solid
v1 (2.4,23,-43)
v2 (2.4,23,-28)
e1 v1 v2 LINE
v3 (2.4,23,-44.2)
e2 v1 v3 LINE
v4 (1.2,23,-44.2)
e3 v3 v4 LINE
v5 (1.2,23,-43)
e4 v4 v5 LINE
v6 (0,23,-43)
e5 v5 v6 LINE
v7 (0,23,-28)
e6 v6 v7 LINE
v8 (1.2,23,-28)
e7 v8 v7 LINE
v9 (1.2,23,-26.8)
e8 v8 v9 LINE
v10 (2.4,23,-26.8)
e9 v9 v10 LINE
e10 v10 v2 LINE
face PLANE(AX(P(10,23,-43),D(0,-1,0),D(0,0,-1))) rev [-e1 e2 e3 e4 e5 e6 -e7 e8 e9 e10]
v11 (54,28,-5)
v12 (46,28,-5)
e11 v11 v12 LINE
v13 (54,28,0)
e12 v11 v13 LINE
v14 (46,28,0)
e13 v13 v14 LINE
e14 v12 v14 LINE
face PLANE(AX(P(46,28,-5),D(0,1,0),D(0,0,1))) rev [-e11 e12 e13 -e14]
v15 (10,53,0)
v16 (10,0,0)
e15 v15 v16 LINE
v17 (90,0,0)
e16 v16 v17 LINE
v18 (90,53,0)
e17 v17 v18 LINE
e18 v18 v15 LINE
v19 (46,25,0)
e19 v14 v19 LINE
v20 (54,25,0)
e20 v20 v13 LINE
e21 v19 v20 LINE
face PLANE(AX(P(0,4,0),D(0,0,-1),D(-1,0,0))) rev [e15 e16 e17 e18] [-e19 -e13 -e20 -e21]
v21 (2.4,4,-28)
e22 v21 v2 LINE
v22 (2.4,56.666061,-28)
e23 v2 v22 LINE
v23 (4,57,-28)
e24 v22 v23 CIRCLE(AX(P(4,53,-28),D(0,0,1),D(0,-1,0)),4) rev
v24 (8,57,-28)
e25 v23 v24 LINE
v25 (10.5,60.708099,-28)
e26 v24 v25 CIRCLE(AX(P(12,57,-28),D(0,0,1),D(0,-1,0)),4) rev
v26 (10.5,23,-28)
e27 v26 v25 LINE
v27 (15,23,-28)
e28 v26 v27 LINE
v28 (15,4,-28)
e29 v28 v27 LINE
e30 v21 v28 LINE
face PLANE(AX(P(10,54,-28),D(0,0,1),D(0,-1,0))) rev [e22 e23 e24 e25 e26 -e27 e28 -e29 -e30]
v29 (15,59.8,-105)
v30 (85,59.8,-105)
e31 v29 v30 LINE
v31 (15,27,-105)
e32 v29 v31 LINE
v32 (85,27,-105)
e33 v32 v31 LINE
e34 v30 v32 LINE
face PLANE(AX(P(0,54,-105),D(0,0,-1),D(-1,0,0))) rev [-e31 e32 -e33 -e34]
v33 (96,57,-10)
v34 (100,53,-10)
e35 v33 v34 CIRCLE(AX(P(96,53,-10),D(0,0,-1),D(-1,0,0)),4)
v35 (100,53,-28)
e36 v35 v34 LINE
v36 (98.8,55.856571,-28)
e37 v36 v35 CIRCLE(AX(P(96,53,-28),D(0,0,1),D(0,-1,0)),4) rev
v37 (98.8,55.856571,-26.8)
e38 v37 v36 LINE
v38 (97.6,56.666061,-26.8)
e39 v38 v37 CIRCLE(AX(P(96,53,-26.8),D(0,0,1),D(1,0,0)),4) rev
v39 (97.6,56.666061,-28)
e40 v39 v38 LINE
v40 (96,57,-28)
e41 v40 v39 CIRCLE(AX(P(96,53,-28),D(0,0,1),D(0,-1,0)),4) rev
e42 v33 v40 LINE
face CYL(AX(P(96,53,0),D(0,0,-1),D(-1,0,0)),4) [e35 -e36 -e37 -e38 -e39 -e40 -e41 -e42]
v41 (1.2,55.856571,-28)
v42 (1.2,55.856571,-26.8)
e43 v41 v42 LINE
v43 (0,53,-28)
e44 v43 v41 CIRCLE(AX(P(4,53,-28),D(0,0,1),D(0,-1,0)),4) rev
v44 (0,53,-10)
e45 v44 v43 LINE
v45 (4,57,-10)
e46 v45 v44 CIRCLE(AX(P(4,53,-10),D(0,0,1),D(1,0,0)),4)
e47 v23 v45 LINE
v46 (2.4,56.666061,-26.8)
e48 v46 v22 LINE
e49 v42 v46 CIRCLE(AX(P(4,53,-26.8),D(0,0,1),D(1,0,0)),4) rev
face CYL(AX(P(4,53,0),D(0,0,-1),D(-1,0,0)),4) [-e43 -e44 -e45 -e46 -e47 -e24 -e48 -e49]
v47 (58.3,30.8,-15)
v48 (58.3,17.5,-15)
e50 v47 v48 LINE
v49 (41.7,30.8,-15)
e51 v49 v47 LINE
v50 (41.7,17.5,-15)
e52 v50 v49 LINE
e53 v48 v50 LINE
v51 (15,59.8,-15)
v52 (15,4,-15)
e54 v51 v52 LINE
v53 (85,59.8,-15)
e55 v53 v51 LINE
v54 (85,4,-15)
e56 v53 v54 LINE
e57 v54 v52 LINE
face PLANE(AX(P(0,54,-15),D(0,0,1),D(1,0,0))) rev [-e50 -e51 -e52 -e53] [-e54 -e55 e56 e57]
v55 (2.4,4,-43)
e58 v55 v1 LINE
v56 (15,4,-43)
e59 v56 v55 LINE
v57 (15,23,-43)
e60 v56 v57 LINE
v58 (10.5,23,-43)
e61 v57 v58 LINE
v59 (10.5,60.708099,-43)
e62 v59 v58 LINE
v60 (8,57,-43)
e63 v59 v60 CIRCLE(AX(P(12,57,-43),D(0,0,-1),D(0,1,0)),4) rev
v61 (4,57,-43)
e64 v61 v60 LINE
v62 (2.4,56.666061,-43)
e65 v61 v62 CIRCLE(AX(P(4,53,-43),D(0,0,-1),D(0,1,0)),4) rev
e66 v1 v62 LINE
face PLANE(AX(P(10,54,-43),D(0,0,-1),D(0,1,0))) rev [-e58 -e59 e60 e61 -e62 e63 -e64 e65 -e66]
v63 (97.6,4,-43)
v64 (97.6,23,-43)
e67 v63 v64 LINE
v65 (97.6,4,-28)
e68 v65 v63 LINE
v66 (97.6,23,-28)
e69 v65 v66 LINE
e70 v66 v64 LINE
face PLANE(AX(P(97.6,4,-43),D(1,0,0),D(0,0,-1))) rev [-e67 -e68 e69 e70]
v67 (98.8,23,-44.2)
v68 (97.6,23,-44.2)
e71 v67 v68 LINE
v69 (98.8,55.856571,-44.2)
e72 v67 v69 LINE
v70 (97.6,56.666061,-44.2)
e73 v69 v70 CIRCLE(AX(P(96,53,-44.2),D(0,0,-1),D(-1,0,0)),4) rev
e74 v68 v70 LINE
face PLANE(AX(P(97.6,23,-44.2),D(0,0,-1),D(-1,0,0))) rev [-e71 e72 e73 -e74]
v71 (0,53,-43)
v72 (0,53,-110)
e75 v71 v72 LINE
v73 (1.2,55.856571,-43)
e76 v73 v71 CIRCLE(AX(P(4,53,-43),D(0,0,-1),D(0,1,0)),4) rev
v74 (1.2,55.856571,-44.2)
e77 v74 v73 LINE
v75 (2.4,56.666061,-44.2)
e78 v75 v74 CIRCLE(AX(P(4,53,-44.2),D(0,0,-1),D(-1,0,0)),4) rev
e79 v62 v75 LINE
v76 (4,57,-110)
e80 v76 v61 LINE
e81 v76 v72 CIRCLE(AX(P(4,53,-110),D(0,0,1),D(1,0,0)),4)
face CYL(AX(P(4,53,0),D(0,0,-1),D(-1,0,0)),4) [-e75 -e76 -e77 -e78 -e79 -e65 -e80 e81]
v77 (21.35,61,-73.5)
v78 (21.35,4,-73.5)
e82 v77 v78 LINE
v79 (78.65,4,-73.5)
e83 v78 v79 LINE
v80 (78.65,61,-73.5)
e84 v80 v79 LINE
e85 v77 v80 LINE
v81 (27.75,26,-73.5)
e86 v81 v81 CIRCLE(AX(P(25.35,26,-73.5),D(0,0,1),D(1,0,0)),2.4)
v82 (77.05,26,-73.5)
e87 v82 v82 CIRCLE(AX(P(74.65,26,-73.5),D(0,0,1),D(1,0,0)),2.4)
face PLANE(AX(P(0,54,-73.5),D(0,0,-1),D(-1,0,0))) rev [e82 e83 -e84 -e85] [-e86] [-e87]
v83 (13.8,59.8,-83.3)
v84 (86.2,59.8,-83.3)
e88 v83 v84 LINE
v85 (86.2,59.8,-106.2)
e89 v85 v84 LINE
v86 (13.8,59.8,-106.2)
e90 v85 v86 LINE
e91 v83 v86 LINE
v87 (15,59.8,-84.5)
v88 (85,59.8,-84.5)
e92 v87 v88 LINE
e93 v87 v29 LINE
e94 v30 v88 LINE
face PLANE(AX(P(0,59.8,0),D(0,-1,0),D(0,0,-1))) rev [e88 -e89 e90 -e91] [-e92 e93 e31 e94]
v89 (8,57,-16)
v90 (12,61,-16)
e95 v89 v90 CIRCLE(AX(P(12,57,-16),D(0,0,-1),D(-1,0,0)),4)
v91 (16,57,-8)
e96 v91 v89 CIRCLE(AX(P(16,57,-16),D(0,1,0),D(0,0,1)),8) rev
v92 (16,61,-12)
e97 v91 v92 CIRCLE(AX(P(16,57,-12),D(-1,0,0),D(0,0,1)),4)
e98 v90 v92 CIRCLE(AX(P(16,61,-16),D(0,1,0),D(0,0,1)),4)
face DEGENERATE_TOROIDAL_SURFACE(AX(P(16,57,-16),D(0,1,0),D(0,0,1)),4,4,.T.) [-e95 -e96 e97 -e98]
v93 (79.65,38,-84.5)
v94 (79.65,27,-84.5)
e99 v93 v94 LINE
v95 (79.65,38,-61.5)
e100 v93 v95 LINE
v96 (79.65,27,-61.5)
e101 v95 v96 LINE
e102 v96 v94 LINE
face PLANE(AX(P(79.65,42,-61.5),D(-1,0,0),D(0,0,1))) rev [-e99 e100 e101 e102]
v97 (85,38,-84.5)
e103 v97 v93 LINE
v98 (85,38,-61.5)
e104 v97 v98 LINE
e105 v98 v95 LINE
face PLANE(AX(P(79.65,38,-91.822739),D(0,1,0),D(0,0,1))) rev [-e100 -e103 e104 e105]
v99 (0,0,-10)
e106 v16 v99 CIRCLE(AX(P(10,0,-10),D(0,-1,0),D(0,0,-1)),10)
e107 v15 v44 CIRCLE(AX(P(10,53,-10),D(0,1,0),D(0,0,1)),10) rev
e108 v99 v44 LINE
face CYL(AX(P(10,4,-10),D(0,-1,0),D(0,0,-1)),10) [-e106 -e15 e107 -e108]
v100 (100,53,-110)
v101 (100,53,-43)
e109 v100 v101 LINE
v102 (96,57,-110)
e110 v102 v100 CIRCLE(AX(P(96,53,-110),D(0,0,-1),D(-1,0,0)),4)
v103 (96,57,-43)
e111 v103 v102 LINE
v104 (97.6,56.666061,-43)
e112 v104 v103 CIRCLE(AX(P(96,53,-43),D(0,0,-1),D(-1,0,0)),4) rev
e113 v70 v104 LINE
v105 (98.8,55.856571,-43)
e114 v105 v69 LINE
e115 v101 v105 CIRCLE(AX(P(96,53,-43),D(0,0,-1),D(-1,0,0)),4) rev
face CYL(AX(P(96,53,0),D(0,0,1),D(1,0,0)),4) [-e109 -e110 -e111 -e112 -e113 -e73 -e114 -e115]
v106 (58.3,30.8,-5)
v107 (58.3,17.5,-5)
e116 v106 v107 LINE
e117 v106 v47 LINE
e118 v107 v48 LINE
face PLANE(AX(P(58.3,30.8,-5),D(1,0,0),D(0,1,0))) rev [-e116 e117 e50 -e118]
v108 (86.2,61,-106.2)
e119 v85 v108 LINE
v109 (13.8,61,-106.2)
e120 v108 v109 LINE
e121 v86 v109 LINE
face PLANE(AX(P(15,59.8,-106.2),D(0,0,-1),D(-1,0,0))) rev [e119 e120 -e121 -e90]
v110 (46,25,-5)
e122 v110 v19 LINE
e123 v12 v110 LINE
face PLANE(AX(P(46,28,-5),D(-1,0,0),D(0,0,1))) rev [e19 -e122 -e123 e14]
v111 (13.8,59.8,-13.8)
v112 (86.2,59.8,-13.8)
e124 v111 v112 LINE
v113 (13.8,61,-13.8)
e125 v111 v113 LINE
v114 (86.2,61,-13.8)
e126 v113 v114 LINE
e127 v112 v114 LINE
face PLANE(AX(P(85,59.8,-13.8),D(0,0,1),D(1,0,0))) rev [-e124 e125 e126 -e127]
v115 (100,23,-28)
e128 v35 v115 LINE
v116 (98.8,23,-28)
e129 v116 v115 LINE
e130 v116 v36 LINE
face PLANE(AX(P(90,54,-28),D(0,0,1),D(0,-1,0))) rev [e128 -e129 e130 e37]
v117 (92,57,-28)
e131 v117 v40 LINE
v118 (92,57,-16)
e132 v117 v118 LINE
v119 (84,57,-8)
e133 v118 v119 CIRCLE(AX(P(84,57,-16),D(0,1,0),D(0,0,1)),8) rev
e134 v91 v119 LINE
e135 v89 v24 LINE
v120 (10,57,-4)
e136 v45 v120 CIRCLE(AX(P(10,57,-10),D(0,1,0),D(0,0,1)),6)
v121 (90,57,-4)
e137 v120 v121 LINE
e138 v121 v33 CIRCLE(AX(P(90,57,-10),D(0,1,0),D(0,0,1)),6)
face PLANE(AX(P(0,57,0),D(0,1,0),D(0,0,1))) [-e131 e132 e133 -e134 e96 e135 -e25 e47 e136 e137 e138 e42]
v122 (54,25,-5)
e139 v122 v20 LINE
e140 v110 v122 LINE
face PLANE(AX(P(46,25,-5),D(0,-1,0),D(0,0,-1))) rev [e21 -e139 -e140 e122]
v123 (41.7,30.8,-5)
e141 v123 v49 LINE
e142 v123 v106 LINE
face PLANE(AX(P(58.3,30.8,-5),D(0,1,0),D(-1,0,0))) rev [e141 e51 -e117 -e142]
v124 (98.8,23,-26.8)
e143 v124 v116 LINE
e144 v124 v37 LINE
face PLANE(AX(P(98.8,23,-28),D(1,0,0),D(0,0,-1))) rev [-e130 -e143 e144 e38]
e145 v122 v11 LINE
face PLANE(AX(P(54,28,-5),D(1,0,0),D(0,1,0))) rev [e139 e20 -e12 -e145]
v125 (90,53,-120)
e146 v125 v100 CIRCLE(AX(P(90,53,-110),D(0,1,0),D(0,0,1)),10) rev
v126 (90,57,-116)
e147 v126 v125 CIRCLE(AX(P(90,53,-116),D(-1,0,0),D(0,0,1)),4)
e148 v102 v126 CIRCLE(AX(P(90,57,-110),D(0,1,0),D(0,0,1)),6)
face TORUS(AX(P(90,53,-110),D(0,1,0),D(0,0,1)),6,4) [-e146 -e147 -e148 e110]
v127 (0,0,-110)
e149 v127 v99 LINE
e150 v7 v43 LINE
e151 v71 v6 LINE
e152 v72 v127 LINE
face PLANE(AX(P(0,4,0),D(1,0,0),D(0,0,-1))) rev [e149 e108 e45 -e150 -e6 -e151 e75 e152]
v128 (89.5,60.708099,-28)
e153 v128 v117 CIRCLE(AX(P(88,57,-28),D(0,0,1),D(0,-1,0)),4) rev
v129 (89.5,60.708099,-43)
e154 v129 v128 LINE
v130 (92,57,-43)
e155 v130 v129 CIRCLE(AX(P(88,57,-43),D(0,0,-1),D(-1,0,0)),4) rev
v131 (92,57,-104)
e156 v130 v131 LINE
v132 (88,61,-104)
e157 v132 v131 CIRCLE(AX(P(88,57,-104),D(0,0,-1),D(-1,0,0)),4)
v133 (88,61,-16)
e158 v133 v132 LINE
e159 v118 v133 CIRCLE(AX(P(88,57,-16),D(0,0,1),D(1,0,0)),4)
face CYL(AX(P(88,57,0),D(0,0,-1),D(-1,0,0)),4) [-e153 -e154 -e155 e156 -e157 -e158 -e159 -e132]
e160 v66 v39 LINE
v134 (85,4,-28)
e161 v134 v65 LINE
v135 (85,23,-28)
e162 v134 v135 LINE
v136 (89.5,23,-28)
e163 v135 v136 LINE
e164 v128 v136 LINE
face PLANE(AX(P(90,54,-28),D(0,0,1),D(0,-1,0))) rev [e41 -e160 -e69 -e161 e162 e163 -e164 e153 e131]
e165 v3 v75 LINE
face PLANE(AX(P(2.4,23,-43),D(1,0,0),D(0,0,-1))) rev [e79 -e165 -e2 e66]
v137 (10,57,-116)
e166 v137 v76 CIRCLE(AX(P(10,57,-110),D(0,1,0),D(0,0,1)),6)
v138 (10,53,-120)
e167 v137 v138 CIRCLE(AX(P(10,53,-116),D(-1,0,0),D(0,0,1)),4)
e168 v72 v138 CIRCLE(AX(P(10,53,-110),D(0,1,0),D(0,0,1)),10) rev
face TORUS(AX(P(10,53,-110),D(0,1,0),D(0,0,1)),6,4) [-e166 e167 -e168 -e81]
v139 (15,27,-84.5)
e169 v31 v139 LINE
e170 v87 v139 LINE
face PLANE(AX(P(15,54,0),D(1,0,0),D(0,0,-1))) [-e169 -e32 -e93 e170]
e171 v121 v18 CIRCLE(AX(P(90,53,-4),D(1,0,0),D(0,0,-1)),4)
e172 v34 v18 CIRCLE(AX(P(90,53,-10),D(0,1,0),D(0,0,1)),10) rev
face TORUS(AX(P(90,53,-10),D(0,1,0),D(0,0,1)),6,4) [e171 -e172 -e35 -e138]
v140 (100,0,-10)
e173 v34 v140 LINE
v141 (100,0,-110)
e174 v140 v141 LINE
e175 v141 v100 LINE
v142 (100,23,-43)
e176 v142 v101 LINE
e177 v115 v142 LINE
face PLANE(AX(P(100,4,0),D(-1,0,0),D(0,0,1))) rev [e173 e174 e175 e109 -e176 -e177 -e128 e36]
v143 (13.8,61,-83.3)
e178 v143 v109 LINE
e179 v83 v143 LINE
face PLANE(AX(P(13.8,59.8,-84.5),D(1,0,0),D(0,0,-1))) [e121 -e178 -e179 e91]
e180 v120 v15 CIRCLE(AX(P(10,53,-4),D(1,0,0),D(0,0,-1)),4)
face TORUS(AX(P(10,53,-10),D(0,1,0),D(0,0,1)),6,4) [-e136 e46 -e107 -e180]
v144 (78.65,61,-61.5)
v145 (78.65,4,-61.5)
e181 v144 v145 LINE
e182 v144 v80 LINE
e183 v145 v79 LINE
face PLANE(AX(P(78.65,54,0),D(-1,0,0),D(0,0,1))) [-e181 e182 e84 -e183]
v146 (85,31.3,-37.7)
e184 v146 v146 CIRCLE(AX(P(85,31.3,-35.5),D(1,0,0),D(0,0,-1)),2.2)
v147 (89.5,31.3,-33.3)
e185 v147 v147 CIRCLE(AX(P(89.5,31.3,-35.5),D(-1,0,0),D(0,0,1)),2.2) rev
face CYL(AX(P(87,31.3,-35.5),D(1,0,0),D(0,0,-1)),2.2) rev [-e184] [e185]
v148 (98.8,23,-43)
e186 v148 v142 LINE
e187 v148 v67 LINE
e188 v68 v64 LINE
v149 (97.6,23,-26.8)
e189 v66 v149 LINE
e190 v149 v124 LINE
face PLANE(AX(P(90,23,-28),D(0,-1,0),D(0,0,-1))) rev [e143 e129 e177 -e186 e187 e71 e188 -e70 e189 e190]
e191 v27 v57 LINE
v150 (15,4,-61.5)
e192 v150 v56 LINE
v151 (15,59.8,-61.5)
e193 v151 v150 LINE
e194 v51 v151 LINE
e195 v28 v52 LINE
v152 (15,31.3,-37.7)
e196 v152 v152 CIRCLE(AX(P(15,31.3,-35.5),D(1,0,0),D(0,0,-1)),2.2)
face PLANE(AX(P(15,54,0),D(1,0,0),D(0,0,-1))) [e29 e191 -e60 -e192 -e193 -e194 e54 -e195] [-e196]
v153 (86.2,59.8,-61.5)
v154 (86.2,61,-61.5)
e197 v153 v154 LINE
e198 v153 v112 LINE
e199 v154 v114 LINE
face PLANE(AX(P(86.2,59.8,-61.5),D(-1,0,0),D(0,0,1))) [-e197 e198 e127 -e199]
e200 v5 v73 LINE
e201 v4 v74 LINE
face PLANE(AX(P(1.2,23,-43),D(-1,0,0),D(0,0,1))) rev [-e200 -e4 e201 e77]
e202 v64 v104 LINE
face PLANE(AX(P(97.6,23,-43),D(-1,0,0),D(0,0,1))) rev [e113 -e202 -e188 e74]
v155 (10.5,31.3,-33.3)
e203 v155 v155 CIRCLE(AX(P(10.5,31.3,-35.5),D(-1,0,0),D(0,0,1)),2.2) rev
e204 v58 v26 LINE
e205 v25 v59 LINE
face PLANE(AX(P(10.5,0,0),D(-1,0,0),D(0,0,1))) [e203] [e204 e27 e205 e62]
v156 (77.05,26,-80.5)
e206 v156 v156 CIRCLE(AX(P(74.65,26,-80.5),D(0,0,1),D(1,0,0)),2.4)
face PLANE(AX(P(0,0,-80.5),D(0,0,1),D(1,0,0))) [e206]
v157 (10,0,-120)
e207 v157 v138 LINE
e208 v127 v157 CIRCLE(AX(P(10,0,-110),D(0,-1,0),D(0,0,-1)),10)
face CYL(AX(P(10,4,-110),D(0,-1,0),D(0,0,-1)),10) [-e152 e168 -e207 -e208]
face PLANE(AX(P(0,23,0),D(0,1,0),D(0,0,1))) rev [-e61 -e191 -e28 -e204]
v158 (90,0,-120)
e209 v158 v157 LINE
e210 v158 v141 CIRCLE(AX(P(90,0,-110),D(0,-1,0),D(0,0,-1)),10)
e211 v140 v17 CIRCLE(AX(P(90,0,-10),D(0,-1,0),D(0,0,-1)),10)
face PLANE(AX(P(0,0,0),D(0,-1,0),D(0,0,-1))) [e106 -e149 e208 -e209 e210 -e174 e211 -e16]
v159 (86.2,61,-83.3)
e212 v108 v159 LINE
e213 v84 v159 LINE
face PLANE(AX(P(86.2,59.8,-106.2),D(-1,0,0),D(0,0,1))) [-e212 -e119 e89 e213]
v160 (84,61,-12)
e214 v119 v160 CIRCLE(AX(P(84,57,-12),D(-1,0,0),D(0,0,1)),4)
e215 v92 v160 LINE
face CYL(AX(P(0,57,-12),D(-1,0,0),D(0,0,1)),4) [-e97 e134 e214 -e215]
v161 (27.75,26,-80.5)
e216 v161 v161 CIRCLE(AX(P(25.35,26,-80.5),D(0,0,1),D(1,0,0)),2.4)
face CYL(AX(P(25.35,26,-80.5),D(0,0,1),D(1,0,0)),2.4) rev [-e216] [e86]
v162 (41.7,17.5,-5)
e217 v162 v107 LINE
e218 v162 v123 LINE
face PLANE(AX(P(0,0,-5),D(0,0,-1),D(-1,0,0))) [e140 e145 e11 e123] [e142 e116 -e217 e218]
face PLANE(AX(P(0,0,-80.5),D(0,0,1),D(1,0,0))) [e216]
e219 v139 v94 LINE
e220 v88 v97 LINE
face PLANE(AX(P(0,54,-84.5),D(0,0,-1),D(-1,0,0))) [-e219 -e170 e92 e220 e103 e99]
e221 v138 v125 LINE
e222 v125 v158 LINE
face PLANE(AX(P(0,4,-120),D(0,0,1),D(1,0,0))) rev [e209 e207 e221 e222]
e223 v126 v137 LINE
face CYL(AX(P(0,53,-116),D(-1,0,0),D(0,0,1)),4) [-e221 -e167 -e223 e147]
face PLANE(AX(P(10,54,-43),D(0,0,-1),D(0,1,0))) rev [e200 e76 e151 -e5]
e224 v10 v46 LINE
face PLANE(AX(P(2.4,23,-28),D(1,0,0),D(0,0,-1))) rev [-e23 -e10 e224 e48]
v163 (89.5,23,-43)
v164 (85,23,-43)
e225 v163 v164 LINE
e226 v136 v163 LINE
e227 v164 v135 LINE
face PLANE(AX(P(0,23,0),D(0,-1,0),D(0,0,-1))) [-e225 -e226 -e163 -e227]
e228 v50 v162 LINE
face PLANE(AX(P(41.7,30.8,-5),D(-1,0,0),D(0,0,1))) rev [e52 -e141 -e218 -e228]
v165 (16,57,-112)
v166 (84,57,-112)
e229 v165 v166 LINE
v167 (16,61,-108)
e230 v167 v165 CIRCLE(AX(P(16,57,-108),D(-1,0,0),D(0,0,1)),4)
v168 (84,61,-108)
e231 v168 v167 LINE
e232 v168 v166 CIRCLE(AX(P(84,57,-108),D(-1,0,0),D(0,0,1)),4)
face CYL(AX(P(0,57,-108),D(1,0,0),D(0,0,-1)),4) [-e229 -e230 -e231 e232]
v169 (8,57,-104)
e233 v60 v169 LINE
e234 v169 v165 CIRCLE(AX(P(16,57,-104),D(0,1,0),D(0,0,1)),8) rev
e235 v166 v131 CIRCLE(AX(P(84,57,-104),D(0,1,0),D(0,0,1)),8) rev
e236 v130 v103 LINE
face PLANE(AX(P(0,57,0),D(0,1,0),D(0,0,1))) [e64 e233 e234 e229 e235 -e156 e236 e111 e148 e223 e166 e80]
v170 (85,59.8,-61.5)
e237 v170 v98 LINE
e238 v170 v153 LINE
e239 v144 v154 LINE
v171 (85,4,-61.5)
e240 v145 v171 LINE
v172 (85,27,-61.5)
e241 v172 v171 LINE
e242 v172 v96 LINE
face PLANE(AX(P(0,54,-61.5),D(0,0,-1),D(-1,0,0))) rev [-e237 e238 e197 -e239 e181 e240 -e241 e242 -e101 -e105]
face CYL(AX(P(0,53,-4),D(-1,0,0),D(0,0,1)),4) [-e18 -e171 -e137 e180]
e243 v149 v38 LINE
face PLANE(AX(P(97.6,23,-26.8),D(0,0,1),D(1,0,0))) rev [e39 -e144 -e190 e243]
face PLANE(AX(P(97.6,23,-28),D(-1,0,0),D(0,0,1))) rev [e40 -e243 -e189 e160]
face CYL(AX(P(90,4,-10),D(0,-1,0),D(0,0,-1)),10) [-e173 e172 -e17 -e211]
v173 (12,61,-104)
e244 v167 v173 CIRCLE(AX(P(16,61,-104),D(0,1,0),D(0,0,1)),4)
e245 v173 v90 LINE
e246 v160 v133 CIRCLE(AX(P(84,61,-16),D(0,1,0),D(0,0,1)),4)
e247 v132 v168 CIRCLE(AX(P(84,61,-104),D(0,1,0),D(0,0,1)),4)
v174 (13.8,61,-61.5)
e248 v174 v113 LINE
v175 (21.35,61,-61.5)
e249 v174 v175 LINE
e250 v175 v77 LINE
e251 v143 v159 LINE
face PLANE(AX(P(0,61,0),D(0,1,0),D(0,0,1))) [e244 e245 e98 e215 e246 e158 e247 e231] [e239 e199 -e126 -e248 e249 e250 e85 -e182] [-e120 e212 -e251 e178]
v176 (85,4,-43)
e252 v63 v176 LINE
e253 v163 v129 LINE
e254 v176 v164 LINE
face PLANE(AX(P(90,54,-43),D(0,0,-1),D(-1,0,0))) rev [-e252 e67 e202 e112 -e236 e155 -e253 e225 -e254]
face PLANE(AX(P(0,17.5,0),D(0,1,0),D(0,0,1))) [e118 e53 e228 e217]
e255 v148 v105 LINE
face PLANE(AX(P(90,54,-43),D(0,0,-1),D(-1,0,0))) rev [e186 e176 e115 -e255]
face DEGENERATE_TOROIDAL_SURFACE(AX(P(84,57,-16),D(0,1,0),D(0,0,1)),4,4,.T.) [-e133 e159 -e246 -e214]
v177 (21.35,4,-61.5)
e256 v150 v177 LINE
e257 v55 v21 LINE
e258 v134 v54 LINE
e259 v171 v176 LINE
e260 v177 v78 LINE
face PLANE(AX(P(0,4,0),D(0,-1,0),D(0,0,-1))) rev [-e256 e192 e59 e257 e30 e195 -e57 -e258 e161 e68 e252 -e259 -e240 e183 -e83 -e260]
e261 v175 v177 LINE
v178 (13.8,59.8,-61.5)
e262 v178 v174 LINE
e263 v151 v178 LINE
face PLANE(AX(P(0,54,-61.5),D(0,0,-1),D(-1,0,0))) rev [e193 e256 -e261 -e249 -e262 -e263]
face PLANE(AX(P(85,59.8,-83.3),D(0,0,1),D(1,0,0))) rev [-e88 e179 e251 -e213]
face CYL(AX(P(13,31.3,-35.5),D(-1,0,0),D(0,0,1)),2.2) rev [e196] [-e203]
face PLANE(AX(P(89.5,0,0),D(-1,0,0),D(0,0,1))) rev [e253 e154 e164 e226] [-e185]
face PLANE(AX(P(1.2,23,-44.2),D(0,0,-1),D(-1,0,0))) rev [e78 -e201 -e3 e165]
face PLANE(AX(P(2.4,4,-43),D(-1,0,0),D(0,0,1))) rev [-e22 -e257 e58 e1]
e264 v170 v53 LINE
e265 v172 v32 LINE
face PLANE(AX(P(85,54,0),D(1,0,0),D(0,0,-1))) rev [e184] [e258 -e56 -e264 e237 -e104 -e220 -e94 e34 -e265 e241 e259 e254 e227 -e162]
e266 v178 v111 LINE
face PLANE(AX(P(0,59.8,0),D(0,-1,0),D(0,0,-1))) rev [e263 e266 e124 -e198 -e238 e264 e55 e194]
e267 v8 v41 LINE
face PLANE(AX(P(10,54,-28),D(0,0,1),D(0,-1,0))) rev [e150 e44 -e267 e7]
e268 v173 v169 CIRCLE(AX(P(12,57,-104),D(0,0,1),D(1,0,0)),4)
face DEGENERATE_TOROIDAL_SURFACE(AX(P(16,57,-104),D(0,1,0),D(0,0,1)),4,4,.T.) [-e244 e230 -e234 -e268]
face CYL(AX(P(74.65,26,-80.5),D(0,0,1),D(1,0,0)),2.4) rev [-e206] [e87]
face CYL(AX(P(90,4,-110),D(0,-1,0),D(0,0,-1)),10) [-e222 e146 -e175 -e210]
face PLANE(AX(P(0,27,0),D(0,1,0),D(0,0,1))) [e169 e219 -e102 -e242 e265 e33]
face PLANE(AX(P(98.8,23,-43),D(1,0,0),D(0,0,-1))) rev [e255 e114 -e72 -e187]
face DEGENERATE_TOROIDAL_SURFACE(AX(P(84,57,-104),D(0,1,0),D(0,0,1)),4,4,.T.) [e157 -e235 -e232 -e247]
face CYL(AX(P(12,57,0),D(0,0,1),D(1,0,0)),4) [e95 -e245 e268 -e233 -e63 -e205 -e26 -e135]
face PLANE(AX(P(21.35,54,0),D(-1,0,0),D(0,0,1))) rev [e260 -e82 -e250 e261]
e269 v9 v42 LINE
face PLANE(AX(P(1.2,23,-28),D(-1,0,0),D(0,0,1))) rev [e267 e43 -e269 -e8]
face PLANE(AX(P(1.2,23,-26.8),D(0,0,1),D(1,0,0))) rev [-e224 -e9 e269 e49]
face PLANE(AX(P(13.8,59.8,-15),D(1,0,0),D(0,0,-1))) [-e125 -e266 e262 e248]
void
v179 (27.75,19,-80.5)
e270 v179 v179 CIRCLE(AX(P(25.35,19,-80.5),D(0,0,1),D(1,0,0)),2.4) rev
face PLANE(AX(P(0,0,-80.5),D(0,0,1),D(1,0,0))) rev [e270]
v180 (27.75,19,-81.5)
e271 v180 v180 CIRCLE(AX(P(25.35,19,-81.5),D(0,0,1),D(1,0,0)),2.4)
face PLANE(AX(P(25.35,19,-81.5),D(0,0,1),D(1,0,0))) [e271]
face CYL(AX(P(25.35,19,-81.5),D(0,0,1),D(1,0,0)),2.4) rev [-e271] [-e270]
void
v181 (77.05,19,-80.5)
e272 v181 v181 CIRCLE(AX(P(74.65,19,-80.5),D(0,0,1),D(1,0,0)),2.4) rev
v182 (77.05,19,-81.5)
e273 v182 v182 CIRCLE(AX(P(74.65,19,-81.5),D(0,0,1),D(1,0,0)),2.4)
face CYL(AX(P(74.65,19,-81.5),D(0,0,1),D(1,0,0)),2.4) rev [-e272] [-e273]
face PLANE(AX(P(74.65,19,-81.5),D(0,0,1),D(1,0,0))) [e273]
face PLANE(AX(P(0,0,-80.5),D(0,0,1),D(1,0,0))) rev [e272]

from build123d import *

# Parameters (mm, degrees)
SKICA2_W                  = 100
SKICA2_H                  = 120
P_IDAT_VYSUNUT_M1_DEPTH   = 4
SKICA3_W                  = 15
SKICA3_H                  = 15
SKICA3_W_2                = 70
SKICA3_W_3                = 57.3
SKICA3_H_2                = 3
P_IDAT_VYSUNUT_M2_DEPTH   = 50
SKICA4_W                  = 70
SKICA4_H                  = 20.5
P_IDAT_VYSUNUT_M3_DEPTH   = 23
SKICA8_W                  = 6.35
SKICA8_H                  = 6
ODEBRAT_VYSUNUT_M1_DEPTH  = 23
SKICA9_W                  = 6.35
SKICA9_H                  = 2
P_IDAT_VYSUNUT_M5_DEPTH   = 6
SKICA10_R                 = 2.4
ODEBRAT_VYSUNUT_M2_DEPTH  = 8
SKICA11_W                 = 16.6
SKICA11_H                 = 11.8
ODEBRAT_VYSUNUT_M5_DEPTH  = 10
SKICA14_W                 = 8
SKICA14_H                 = 3
ODEBRAT_VYSUNUT_M6_DEPTH  = 5
SKICA15_W                 = 100
SKICA15_H                 = 120
SKICA15_W_2               = 84
SKICA15_H_2               = 104
ODEBRAT_VYSUNUT_M7_DEPTH  = 4
SKICA20_W                 = 15
SKICA20_H                 = 31
ODEBRAT_VYSUNUT_M8_DEPTH  = 10
SKICA21_W                 = 15
SKICA21_H                 = 31
ODEBRAT_VYSUNUT_M10_DEPTH = 10
SKICA22_R                 = 2.2
ODEBRAT_VYSUNUT_M11_DEPTH = 3
ODEBRAT_START             = -3
SKICA23_R                 = 2.2
ODEBRAT_VYSUNUT_M12_DEPTH = 3
SKICA24_W                 = 1.2
SKICA24_H                 = 1.2
ODEBRAT_VYSUNUT_M14_DEPTH = 27
SKICA26_W                 = 12.6
SKICA26_H                 = 15
ODEBRAT_VYSUNUT_M16_DEPTH = 19
SKICA32_R                 = 2.2
ODEBRAT_VYSUNUT_M19_DEPTH = 158.749801902
SKICA33_W                 = 2
SKICA33_H                 = 6
ODEBRAT_VYSUNUT_M20_DEPTH = 6.35
SKICA35_W                 = 16.6
SKICA35_H                 = 10
ODEBRAT_VYSUNUT_M21_DEPTH = 1.5
SKICA38_W                 = 1
SKICA38_H                 = 23
P_IDAT_VYSUNUT_M9_DEPTH   = 15
SKICA39_W                 = 5.35
SKICA39_H                 = 5
ODEBRAT_VYSUNUT_M23_DEPTH = 23
SKICA40_W                 = 15
SKICA40_H                 = 31
ODEBRAT_VYSUNUT_M24_DEPTH = 0.5
SKICA41_W                 = 15
SKICA41_H                 = 31
ODEBRAT_VYSUNUT_M25_DEPTH = 0.5
SKICA43_W                 = 70
SKICA43_H                 = 20.5
P_IDAT_VYSUNUT_M10_DEPTH  = 7
P_IDAT_VYSUNUT_M11_DEPTH  = 7
SKICA45_W                 = 70
SKICA45_H                 = 1.2
SKICA45_H_2               = 20.5
SKICA45_W_2               = 1.2
SKICA45_H_3               = 46.5
ODEBRAT_VYSUNUT_M26_DEPTH = 1.2
ZAOBLIT1_R                = 10
ZAOBLIT2_R                = 8
ZAOBLIT3_R                = 4
SKICA47_R                 = 2.4
P_IDAT_VYSUNUT_M13_DEPTH  = 7
SKICA47_3_R               = 2.4
ODEBRAT_VYSUNUT_M27_DEPTH = 7


with BuildPart() as part:
    # Skica2 → Přidat vysunutím1 (new body)
    with BuildSketch(Plane(origin=(0, 0, 0), x_dir=(1, 0, 0), z_dir=(0, 1, 0))):
        with Locations((50, 60)):
            Rectangle(SKICA2_W, SKICA2_H)
    extrude(amount=P_IDAT_VYSUNUT_M1_DEPTH)

    # Skica3 → Přidat vysunutím2 (add)
    with BuildSketch(Plane(origin=(0, 4, 0), x_dir=(1, 0, 0), z_dir=(0, 1, 0))):
        with Locations((7.5, 112.5)):
            Rectangle(SKICA3_W, SKICA3_H)
        with Locations((50, 112.5)):
            Rectangle(SKICA3_W_2, SKICA3_H)
        Polygon((15, 105), (0, 105), (0, 15), (15, 15), (15, 61.5), (15, 76.5), (15, 84.5), align=None)
        with Locations((92.5, 112.5)):
            Rectangle(SKICA3_W, SKICA3_H)
        Polygon((100, 105), (85, 105), (85, 84.5), (85, 76.5), (85, 61.5), (85, 15), (100, 15), align=None)
        Polygon((85, 84.5), (15, 84.5), (15, 76.5), (21.35, 76.5), (78.65, 76.5), (85, 76.5), align=None)
        with Locations((7.5, 7.5)):
            Rectangle(SKICA3_W, SKICA3_H)
        with Locations((50, 7.5)):
            Rectangle(SKICA3_W_2, SKICA3_H)
        with Locations((92.5, 7.5)):
            Rectangle(SKICA3_W, SKICA3_H)
        Polygon((21.35, 76.5), (15, 76.5), (15, 61.5), (21.35, 61.5), (21.35, 73.5), align=None)
        with Locations((50, 75)):
            Rectangle(SKICA3_W_3, SKICA3_H_2)
        Polygon((85, 61.5), (85, 76.5), (78.65, 76.5), (78.65, 73.5), (78.65, 61.5), align=None)
    extrude(amount=P_IDAT_VYSUNUT_M2_DEPTH)

    # Skica4 → Přidat vysunutím3 (add)
    with BuildSketch(Plane(origin=(0, 4, 0), x_dir=(1, 0, 0), z_dir=(0, 1, 0))):
        with Locations((50, 94.75)):
            Rectangle(SKICA4_W, SKICA4_H)
    extrude(amount=P_IDAT_VYSUNUT_M3_DEPTH)

    # Skica8 → Odebrat vysunutím1 (cut)
    with BuildSketch(Plane.XY.offset(-61.5)):
        with Locations((81.825, 30)):
            Rectangle(SKICA8_W, SKICA8_H)
    extrude(amount=-ODEBRAT_VYSUNUT_M1_DEPTH, mode=Mode.SUBTRACT)

    # Skica9 → Přidat vysunutím5 (add)
    with BuildSketch(Plane(origin=(0, 27, 0), x_dir=(1, 0, 0), z_dir=(0, 1, 0))):
        with Locations((81.825, 62.5)):
            Rectangle(SKICA9_W, SKICA9_H)
    extrude(amount=P_IDAT_VYSUNUT_M5_DEPTH)

    # Skica10 → Odebrat vysunutím2 (cut)
    with BuildSketch(Plane.XY.offset(-73.5)):
        with Locations((25.35, 19)):
            Circle(SKICA10_R)
        with Locations((74.65, 19)):
            Circle(SKICA10_R)
    extrude(amount=-ODEBRAT_VYSUNUT_M2_DEPTH, mode=Mode.SUBTRACT)

    # Skica11 → Odebrat vysunutím5 (cut)
    with BuildSketch(Plane(origin=(0, 0, -15), x_dir=(-1, 0, 0), z_dir=(0, 0, -1))):
        with Locations((-50, 24.9)):
            Rectangle(SKICA11_W, SKICA11_H)
    extrude(amount=-ODEBRAT_VYSUNUT_M5_DEPTH, mode=Mode.SUBTRACT)

    # Skica14 → Odebrat vysunutím6 (cut)
    with BuildSketch(Plane.XY):
        with Locations((50, 26.5)):
            Rectangle(SKICA14_W, SKICA14_H)
    extrude(amount=-ODEBRAT_VYSUNUT_M6_DEPTH, mode=Mode.SUBTRACT)

    # Skica15 → Odebrat vysunutím7 (cut)
    with BuildSketch(Plane(origin=(0, 54, 0), x_dir=(1, 0, 0), z_dir=(0, 1, 0))):
        with Locations((50, 60)):
            Rectangle(SKICA15_W, SKICA15_H)
        with Locations((50, 60)):
            Rectangle(SKICA15_W_2, SKICA15_H_2, mode=Mode.SUBTRACT)
    extrude(amount=-ODEBRAT_VYSUNUT_M7_DEPTH, mode=Mode.SUBTRACT)

    # Skica20 → Odebrat vysunutím8 (cut)
    with BuildSketch(Plane.ZY):
        with Locations((-35.5, 38.5)):
            Rectangle(SKICA20_W, SKICA20_H)
    extrude(amount=-ODEBRAT_VYSUNUT_M8_DEPTH, mode=Mode.SUBTRACT)

    # Skica21 → Odebrat vysunutím10 (cut)
    with BuildSketch(Plane(origin=(100, 0, 0), x_dir=(0, 0, -1), z_dir=(1, 0, 0))):
        with Locations((35.5, 38.5)):
            Rectangle(SKICA21_W, SKICA21_H)
    extrude(amount=-ODEBRAT_VYSUNUT_M10_DEPTH, mode=Mode.SUBTRACT)

    # Skica22 → Odebrat vysunutím11 (cut)
    with BuildSketch(Plane.ZY.offset(-10)):
        with Locations((-35.5, 31.3)):
            Circle(SKICA22_R)
    extrude(amount=-ODEBRAT_VYSUNUT_M11_DEPTH, mode=Mode.SUBTRACT)

    # Skica23 → Odebrat vysunutím12 (cut)
    with BuildSketch(Plane(origin=(90, 0, 0), x_dir=(0, 0, -1), z_dir=(1, 0, 0)).offset(ODEBRAT_START)):
        with Locations(Location((35.5, 31.3, 0), (0, 0, 180))):
            Circle(SKICA23_R)
    extrude(amount=ODEBRAT_VYSUNUT_M12_DEPTH, mode=Mode.SUBTRACT)

    # Skica24 → Odebrat vysunutím14 (cut)
    with BuildSketch(Plane(origin=(0, 50, 0), x_dir=(1, 0, 0), z_dir=(0, 1, 0))):
        with Locations((1.8, 27.4)):
            Rectangle(SKICA24_W, SKICA24_H)
        with Locations((1.8, 43.6)):
            Rectangle(SKICA24_W, SKICA24_H)
        with Locations((98.2, 27.4)):
            Rectangle(SKICA24_W, SKICA24_H)
        with Locations((98.2, 43.6)):
            Rectangle(SKICA24_W, SKICA24_H)
    extrude(amount=-ODEBRAT_VYSUNUT_M14_DEPTH, mode=Mode.SUBTRACT)

    # Skica26 → Odebrat vysunutím16 (cut)
    with BuildSketch(Plane(origin=(0, 23, 0), x_dir=(1, 0, 0), z_dir=(0, 1, 0))):
        with Locations((8.7, 35.5)):
            Rectangle(SKICA26_W, SKICA26_H)
        with Locations((91.3, 35.5)):
            Rectangle(SKICA26_W, SKICA26_H)
    extrude(amount=-ODEBRAT_VYSUNUT_M16_DEPTH, mode=Mode.SUBTRACT)

    # Skica32 → Odebrat vysunutím19 (cut, through all)
    with BuildSketch(Plane.ZY.offset(-13)):
        with Locations((-35.5, 31.3)):
            Circle(SKICA32_R)
    extrude(amount=-ODEBRAT_VYSUNUT_M19_DEPTH, mode=Mode.SUBTRACT)

    # Skica33 → Odebrat vysunutím20 (cut)
    with BuildSketch(Plane.ZY.offset(-78.65)):
        with Locations((-62.5, 30)):
            Rectangle(SKICA33_W, SKICA33_H)
    extrude(amount=-ODEBRAT_VYSUNUT_M20_DEPTH, mode=Mode.SUBTRACT)

    # Skica35 → Odebrat vysunutím21 (cut)
    with BuildSketch(Plane(origin=(0, 19, 0), x_dir=(1, 0, 0), z_dir=(0, 1, 0))):
        with Locations((50, 10)):
            Rectangle(SKICA35_W, SKICA35_H)
    extrude(amount=-ODEBRAT_VYSUNUT_M21_DEPTH, mode=Mode.SUBTRACT)

    # Skica38 → Přidat vysunutím9 (add)
    with BuildSketch(Plane(origin=(0, 27, 0), x_dir=(1, 0, 0), z_dir=(0, 1, 0))):
        with Locations((79.15, 73)):
            Rectangle(SKICA38_W, SKICA38_H)
    extrude(amount=P_IDAT_VYSUNUT_M9_DEPTH)

    # Skica39 → Odebrat vysunutím23 (cut)
    with BuildSketch(Plane.XY.offset(-61.5)):
        with Locations((82.325, 35.5)):
            Rectangle(SKICA39_W, SKICA39_H)
    extrude(amount=-ODEBRAT_VYSUNUT_M23_DEPTH, mode=Mode.SUBTRACT)

    # Skica40 → Odebrat vysunutím24 (cut)
    with BuildSketch(Plane.ZY.offset(-10)):
        with Locations((-35.5, 38.5)):
            Rectangle(SKICA40_W, SKICA40_H)
    extrude(amount=-ODEBRAT_VYSUNUT_M24_DEPTH, mode=Mode.SUBTRACT)

    # Skica41 → Odebrat vysunutím25 (cut)
    with BuildSketch(Plane(origin=(90, 0, 0), x_dir=(0, 0, -1), z_dir=(1, 0, 0))):
        with Locations((35.5, 38.5)):
            Rectangle(SKICA41_W, SKICA41_H)
    extrude(amount=-ODEBRAT_VYSUNUT_M25_DEPTH, mode=Mode.SUBTRACT)

    # Skica43 → Přidat vysunutím10 (add)
    with BuildSketch(Plane(origin=(0, 54, 0), x_dir=(1, 0, 0), z_dir=(0, 1, 0))):
        Polygon((92, 8), (92, 28), (89.5, 28), (89.5, 43), (92, 43), (92, 112), (8, 112), (8, 43), (10.5, 43), (10.5, 28), (8, 28), (8, 8), align=None)
        with Locations((50, 94.75)):
            Rectangle(SKICA43_W, SKICA43_H, mode=Mode.SUBTRACT)
        Polygon((78.65, 73.5), (78.65, 61.5), (85, 61.5), (85, 15), (15, 15), (15, 61.5), (21.35, 61.5), (21.35, 73.5), align=None, mode=Mode.SUBTRACT)
    extrude(amount=P_IDAT_VYSUNUT_M10_DEPTH)

    # Skica44 → Přidat vysunutím11 (add)
    with BuildSketch(Plane(origin=(0, 50, 0), x_dir=(1, 0, 0), z_dir=(0, 1, 0))):
        Polygon((0, 120), (0, 43), (1.2, 43), (1.2, 44.2), (2.4, 44.2), (2.4, 43), (8, 43), (8, 112), (92, 112), (92, 43), (97.6, 43), (97.6, 44.2), (98.8, 44.2), (98.8, 43), (100, 43), (100, 120), align=None)
        Polygon((1.2, 28), (0, 28), (0, 0), (100, 0), (100, 28), (98.8, 28), (98.8, 26.8), (97.6, 26.8), (97.6, 28), (92, 28), (92, 8), (8, 8), (8, 28), (2.4, 28), (2.4, 26.8), (1.2, 26.8), align=None)
    extrude(amount=P_IDAT_VYSUNUT_M11_DEPTH)

    # Skica45 → Odebrat vysunutím26 (cut)
    with BuildSketch(Plane(origin=(0, 61, 0), x_dir=(1, 0, 0), z_dir=(0, 1, 0))):
        with Locations((50, 105.6)):
            Rectangle(SKICA45_W, SKICA45_H)
        Polygon((15, 84.5), (15, 105), (15, 106.2), (13.8, 106.2), (13.8, 84.5), align=None)
        with Locations((50, 94.75)):
            Rectangle(SKICA45_W, SKICA45_H_2)
        Polygon((85, 106.2), (85, 105), (85, 84.5), (85, 83.3), (86.2, 83.3), (86.2, 106.2), align=None)
        Polygon((85, 84.5), (15, 84.5), (13.8, 84.5), (13.8, 83.3), (85, 83.3), align=None)
        Polygon((85, 15), (15, 15), (13.8, 15), (13.8, 13.8), (85, 13.8), align=None)
        with Locations((14.4, 38.25)):
            Rectangle(SKICA45_W_2, SKICA45_H_3)
        Polygon((85, 61.5), (85, 15), (85, 13.8), (86.2, 13.8), (86.2, 61.5), align=None)
    extrude(amount=-ODEBRAT_VYSUNUT_M26_DEPTH, mode=Mode.SUBTRACT)

    # Zaoblit1
    zaoblit1_edges = [part.edges().sort_by_distance(p)[0] for p in [
        (0, 28.5, -120),
        (100, 28.5, -120),
        (100, 28.5, 0),
        (0, 28.5, 0),
    ]]
    fillet(zaoblit1_edges, radius=ZAOBLIT1_R)

    # Zaoblit2
    zaoblit2_edges = [part.edges().sort_by_distance(p)[0] for p in [
        (92, 59, -8),
        (8, 59, -8),
        (8, 59, -112),
        (92, 59, -112),
    ]]
    fillet(zaoblit2_edges, radius=ZAOBLIT2_R)

    # Zaoblit3
    # the kernel refuses this fillet: 4 mm, written as the material it takes off along each edge
    with BuildSketch(Plane(origin=(8, 61, -104), x_dir=(1, 0, 0), z_dir=(0, 0, 1)), Plane(origin=(92, 61, -33), x_dir=(-1, 0, 0), z_dir=(0, 0, -1))) as zaoblit3_piece_1:
        with BuildLine():
            CenterArc((ZAOBLIT3_R, -ZAOBLIT3_R), ZAOBLIT3_R, 90, 90)
            Line((0, -ZAOBLIT3_R), (0, 0))
            Line((0, 0), (ZAOBLIT3_R, 0))
        make_face()
    extrude(amount=71, mode=Mode.SUBTRACT)
    with BuildSketch(Plane(origin=(100, 57, -10), x_dir=(-1, 0, 0), z_dir=(0, 0, -1)), Plane(origin=(0, 57, -38), x_dir=(1, 0, 0), z_dir=(0, 0, 1))) as zaoblit3_piece_2:
        with BuildLine():
            CenterArc((ZAOBLIT3_R, -ZAOBLIT3_R), ZAOBLIT3_R, 90, 90)
            Line((0, -ZAOBLIT3_R), (0, 0))
            Line((0, 0), (ZAOBLIT3_R, 0))
        make_face()
    extrude(amount=28, mode=Mode.SUBTRACT)
    with BuildSketch(Plane(origin=(100, 57, -33), x_dir=(0, -1, 0), z_dir=(0, 0, -1)), Plane(origin=(0, 57, -110), x_dir=(0, -1, 0), z_dir=(0, 0, 1))) as zaoblit3_piece_3:
        with BuildLine():
            CenterArc((ZAOBLIT3_R, ZAOBLIT3_R), ZAOBLIT3_R, 180, 90)
            Line((0, ZAOBLIT3_R), (0, 0))
            Line((0, 0), (ZAOBLIT3_R, 0))
        make_face()
    extrude(amount=77, mode=Mode.SUBTRACT)
    with BuildSketch(Plane(origin=(10, 57, 0), x_dir=(0, 0, -1), z_dir=(1, 0, 0)), Plane(origin=(90, 57, -120), x_dir=(0, 0, 1), z_dir=(-1, 0, 0))) as zaoblit3_piece_4:
        with BuildLine():
            CenterArc((ZAOBLIT3_R, -ZAOBLIT3_R), ZAOBLIT3_R, 90, 90)
            Line((0, -ZAOBLIT3_R), (0, 0))
            Line((0, 0), (ZAOBLIT3_R, 0))
        make_face()
    extrude(amount=80, mode=Mode.SUBTRACT)
    with BuildSketch(Plane(origin=(10, 57, -10), x_dir=(0, 0, 1), z_dir=(1, 0, 0))) as zaoblit3_piece_5:
        with BuildLine():
            CenterArc((10 - ZAOBLIT3_R, ZAOBLIT3_R), ZAOBLIT3_R, 270, 90)
            Line((10, ZAOBLIT3_R), (10, 0))
            Line((10, 0), (10 - ZAOBLIT3_R, 0))
        make_face()
    revolve(axis=Axis((10, 57, -10), (0, -1, 0)), revolution_arc=90, mode=Mode.SUBTRACT)
    with BuildSketch(Plane(origin=(90, 57, -10), x_dir=(0, 0, 1), z_dir=(-1, 0, 0))) as zaoblit3_piece_6:
        with BuildLine():
            CenterArc((10 - ZAOBLIT3_R, -ZAOBLIT3_R), ZAOBLIT3_R, 0, 90)
            Line((10, -ZAOBLIT3_R), (10, 0))
            Line((10, 0), (10 - ZAOBLIT3_R, 0))
        make_face()
    revolve(axis=Axis((90, 57, -10), (0, 1, 0)), revolution_arc=90, mode=Mode.SUBTRACT)
    with BuildSketch(Plane(origin=(10, 57, -110), x_dir=(0, 0, -1), z_dir=(1, 0, 0))) as zaoblit3_piece_7:
        with BuildLine():
            CenterArc((10 - ZAOBLIT3_R, -ZAOBLIT3_R), ZAOBLIT3_R, 0, 90)
            Line((10, -ZAOBLIT3_R), (10, 0))
            Line((10, 0), (10 - ZAOBLIT3_R, 0))
        make_face()
    revolve(axis=Axis((10, 57, -110), (0, 1, 0)), revolution_arc=90, mode=Mode.SUBTRACT)
    with BuildSketch(Plane(origin=(90, 57, -110), x_dir=(0, 0, -1), z_dir=(-1, 0, 0))) as zaoblit3_piece_8:
        with BuildLine():
            CenterArc((10 - ZAOBLIT3_R, ZAOBLIT3_R), ZAOBLIT3_R, 270, 90)
            Line((10, ZAOBLIT3_R), (10, 0))
            Line((10, 0), (10 - ZAOBLIT3_R, 0))
        make_face()
    revolve(axis=Axis((90, 57, -110), (0, -1, 0)), revolution_arc=90, mode=Mode.SUBTRACT)
    with BuildSketch(Plane(origin=(16, 61, -8), x_dir=(0, -1, 0), z_dir=(1, 0, 0))) as zaoblit3_piece_9:
        with BuildLine():
            CenterArc((ZAOBLIT3_R, ZAOBLIT3_R), ZAOBLIT3_R, 180, 90)
            Line((0, ZAOBLIT3_R), (0, 0))
            Line((0, 0), (ZAOBLIT3_R, 0))
        make_face()
    extrude(amount=68, mode=Mode.SUBTRACT)
    with BuildSketch(Plane(origin=(84, 61, -112), x_dir=(0, 0, 1), z_dir=(-1, 0, 0))) as zaoblit3_piece_10:
        with BuildLine():
            CenterArc((ZAOBLIT3_R, -ZAOBLIT3_R), ZAOBLIT3_R, 90, 90)
            Line((0, -ZAOBLIT3_R), (0, 0))
            Line((0, 0), (ZAOBLIT3_R, 0))
        make_face()
    extrude(amount=68, mode=Mode.SUBTRACT)
    with BuildSketch(Plane(origin=(84, 61, -16), x_dir=(0, 0, 1), z_dir=(-1, 0, 0))) as zaoblit3_piece_11:
        with BuildLine():
            CenterArc((8 - ZAOBLIT3_R, -ZAOBLIT3_R), ZAOBLIT3_R, 0, 90)
            Line((8 - ZAOBLIT3_R, 0), (8, 0))
            Line((8, 0), (8, -ZAOBLIT3_R))
        make_face()
    revolve(axis=Axis((84, 61, -16), (0, 1, 0)), revolution_arc=90, mode=Mode.SUBTRACT)
    with BuildSketch(Plane(origin=(84, 61, -104), x_dir=(0, 0, -1), z_dir=(-1, 0, 0))) as zaoblit3_piece_12:
        with BuildLine():
            CenterArc((8 - ZAOBLIT3_R, ZAOBLIT3_R), ZAOBLIT3_R, 270, 90)
            Line((8, ZAOBLIT3_R), (8, 0))
            Line((8, 0), (8 - ZAOBLIT3_R, 0))
        make_face()
    revolve(axis=Axis((84, 61, -104), (0, -1, 0)), revolution_arc=90, mode=Mode.SUBTRACT)
    with BuildSketch(Plane(origin=(16, 61, -104), x_dir=(-1, 0, 0), z_dir=(0, 0, 1))) as zaoblit3_piece_13:
        with BuildLine():
            CenterArc((8 - ZAOBLIT3_R, ZAOBLIT3_R), ZAOBLIT3_R, 270, 90)
            Line((8, ZAOBLIT3_R), (8, 0))
            Line((8, 0), (8 - ZAOBLIT3_R, 0))
        make_face()
    revolve(axis=Axis((16, 61, -104), (0, -1, 0)), revolution_arc=90, mode=Mode.SUBTRACT)
    with BuildSketch(Plane(origin=(16, 61, -16), x_dir=(-1, 0, 0), z_dir=(0, 0, -1))) as zaoblit3_piece_14:
        with BuildLine():
            CenterArc((8 - ZAOBLIT3_R, -ZAOBLIT3_R), ZAOBLIT3_R, 0, 90)
            Line((8 - ZAOBLIT3_R, 0), (8, 0))
            Line((8, 0), (8, -ZAOBLIT3_R))
        make_face()
    revolve(axis=Axis((16, 61, -16), (0, 1, 0)), revolution_arc=90, mode=Mode.SUBTRACT)
    with BuildSketch(Plane(origin=(8, 61, -38), x_dir=(0, -1, 0), z_dir=(0, 0, 1)), Plane(origin=(92, 61, -16), x_dir=(0, -1, 0), z_dir=(0, 0, -1))) as zaoblit3_piece_15:
        with BuildLine():
            CenterArc((ZAOBLIT3_R, ZAOBLIT3_R), ZAOBLIT3_R, 180, 90)
            Line((0, ZAOBLIT3_R), (0, 0))
            Line((0, 0), (ZAOBLIT3_R, 0))
        make_face()
    extrude(amount=22, mode=Mode.SUBTRACT)

    # Skica47 → Přidat vysunutím13 (add)
    with BuildSketch(Plane.XY.offset(-73.5)):
        with Locations((25.35, 19)):
            Circle(SKICA47_R)
        with Locations((74.65, 19)):
            Circle(SKICA47_R)
    extrude(amount=-P_IDAT_VYSUNUT_M13_DEPTH)

    # Skica47<3> → Odebrat vysunutím27 (cut)
    with BuildSketch(Plane.XY.offset(-73.5)):
        with Locations((25.35, 26)):
            Circle(SKICA47_3_R)
        with Locations((74.65, 26)):
            Circle(SKICA47_3_R)
    extrude(amount=-ODEBRAT_VYSUNUT_M27_DEPTH, mode=Mode.SUBTRACT)


solid = part.part
